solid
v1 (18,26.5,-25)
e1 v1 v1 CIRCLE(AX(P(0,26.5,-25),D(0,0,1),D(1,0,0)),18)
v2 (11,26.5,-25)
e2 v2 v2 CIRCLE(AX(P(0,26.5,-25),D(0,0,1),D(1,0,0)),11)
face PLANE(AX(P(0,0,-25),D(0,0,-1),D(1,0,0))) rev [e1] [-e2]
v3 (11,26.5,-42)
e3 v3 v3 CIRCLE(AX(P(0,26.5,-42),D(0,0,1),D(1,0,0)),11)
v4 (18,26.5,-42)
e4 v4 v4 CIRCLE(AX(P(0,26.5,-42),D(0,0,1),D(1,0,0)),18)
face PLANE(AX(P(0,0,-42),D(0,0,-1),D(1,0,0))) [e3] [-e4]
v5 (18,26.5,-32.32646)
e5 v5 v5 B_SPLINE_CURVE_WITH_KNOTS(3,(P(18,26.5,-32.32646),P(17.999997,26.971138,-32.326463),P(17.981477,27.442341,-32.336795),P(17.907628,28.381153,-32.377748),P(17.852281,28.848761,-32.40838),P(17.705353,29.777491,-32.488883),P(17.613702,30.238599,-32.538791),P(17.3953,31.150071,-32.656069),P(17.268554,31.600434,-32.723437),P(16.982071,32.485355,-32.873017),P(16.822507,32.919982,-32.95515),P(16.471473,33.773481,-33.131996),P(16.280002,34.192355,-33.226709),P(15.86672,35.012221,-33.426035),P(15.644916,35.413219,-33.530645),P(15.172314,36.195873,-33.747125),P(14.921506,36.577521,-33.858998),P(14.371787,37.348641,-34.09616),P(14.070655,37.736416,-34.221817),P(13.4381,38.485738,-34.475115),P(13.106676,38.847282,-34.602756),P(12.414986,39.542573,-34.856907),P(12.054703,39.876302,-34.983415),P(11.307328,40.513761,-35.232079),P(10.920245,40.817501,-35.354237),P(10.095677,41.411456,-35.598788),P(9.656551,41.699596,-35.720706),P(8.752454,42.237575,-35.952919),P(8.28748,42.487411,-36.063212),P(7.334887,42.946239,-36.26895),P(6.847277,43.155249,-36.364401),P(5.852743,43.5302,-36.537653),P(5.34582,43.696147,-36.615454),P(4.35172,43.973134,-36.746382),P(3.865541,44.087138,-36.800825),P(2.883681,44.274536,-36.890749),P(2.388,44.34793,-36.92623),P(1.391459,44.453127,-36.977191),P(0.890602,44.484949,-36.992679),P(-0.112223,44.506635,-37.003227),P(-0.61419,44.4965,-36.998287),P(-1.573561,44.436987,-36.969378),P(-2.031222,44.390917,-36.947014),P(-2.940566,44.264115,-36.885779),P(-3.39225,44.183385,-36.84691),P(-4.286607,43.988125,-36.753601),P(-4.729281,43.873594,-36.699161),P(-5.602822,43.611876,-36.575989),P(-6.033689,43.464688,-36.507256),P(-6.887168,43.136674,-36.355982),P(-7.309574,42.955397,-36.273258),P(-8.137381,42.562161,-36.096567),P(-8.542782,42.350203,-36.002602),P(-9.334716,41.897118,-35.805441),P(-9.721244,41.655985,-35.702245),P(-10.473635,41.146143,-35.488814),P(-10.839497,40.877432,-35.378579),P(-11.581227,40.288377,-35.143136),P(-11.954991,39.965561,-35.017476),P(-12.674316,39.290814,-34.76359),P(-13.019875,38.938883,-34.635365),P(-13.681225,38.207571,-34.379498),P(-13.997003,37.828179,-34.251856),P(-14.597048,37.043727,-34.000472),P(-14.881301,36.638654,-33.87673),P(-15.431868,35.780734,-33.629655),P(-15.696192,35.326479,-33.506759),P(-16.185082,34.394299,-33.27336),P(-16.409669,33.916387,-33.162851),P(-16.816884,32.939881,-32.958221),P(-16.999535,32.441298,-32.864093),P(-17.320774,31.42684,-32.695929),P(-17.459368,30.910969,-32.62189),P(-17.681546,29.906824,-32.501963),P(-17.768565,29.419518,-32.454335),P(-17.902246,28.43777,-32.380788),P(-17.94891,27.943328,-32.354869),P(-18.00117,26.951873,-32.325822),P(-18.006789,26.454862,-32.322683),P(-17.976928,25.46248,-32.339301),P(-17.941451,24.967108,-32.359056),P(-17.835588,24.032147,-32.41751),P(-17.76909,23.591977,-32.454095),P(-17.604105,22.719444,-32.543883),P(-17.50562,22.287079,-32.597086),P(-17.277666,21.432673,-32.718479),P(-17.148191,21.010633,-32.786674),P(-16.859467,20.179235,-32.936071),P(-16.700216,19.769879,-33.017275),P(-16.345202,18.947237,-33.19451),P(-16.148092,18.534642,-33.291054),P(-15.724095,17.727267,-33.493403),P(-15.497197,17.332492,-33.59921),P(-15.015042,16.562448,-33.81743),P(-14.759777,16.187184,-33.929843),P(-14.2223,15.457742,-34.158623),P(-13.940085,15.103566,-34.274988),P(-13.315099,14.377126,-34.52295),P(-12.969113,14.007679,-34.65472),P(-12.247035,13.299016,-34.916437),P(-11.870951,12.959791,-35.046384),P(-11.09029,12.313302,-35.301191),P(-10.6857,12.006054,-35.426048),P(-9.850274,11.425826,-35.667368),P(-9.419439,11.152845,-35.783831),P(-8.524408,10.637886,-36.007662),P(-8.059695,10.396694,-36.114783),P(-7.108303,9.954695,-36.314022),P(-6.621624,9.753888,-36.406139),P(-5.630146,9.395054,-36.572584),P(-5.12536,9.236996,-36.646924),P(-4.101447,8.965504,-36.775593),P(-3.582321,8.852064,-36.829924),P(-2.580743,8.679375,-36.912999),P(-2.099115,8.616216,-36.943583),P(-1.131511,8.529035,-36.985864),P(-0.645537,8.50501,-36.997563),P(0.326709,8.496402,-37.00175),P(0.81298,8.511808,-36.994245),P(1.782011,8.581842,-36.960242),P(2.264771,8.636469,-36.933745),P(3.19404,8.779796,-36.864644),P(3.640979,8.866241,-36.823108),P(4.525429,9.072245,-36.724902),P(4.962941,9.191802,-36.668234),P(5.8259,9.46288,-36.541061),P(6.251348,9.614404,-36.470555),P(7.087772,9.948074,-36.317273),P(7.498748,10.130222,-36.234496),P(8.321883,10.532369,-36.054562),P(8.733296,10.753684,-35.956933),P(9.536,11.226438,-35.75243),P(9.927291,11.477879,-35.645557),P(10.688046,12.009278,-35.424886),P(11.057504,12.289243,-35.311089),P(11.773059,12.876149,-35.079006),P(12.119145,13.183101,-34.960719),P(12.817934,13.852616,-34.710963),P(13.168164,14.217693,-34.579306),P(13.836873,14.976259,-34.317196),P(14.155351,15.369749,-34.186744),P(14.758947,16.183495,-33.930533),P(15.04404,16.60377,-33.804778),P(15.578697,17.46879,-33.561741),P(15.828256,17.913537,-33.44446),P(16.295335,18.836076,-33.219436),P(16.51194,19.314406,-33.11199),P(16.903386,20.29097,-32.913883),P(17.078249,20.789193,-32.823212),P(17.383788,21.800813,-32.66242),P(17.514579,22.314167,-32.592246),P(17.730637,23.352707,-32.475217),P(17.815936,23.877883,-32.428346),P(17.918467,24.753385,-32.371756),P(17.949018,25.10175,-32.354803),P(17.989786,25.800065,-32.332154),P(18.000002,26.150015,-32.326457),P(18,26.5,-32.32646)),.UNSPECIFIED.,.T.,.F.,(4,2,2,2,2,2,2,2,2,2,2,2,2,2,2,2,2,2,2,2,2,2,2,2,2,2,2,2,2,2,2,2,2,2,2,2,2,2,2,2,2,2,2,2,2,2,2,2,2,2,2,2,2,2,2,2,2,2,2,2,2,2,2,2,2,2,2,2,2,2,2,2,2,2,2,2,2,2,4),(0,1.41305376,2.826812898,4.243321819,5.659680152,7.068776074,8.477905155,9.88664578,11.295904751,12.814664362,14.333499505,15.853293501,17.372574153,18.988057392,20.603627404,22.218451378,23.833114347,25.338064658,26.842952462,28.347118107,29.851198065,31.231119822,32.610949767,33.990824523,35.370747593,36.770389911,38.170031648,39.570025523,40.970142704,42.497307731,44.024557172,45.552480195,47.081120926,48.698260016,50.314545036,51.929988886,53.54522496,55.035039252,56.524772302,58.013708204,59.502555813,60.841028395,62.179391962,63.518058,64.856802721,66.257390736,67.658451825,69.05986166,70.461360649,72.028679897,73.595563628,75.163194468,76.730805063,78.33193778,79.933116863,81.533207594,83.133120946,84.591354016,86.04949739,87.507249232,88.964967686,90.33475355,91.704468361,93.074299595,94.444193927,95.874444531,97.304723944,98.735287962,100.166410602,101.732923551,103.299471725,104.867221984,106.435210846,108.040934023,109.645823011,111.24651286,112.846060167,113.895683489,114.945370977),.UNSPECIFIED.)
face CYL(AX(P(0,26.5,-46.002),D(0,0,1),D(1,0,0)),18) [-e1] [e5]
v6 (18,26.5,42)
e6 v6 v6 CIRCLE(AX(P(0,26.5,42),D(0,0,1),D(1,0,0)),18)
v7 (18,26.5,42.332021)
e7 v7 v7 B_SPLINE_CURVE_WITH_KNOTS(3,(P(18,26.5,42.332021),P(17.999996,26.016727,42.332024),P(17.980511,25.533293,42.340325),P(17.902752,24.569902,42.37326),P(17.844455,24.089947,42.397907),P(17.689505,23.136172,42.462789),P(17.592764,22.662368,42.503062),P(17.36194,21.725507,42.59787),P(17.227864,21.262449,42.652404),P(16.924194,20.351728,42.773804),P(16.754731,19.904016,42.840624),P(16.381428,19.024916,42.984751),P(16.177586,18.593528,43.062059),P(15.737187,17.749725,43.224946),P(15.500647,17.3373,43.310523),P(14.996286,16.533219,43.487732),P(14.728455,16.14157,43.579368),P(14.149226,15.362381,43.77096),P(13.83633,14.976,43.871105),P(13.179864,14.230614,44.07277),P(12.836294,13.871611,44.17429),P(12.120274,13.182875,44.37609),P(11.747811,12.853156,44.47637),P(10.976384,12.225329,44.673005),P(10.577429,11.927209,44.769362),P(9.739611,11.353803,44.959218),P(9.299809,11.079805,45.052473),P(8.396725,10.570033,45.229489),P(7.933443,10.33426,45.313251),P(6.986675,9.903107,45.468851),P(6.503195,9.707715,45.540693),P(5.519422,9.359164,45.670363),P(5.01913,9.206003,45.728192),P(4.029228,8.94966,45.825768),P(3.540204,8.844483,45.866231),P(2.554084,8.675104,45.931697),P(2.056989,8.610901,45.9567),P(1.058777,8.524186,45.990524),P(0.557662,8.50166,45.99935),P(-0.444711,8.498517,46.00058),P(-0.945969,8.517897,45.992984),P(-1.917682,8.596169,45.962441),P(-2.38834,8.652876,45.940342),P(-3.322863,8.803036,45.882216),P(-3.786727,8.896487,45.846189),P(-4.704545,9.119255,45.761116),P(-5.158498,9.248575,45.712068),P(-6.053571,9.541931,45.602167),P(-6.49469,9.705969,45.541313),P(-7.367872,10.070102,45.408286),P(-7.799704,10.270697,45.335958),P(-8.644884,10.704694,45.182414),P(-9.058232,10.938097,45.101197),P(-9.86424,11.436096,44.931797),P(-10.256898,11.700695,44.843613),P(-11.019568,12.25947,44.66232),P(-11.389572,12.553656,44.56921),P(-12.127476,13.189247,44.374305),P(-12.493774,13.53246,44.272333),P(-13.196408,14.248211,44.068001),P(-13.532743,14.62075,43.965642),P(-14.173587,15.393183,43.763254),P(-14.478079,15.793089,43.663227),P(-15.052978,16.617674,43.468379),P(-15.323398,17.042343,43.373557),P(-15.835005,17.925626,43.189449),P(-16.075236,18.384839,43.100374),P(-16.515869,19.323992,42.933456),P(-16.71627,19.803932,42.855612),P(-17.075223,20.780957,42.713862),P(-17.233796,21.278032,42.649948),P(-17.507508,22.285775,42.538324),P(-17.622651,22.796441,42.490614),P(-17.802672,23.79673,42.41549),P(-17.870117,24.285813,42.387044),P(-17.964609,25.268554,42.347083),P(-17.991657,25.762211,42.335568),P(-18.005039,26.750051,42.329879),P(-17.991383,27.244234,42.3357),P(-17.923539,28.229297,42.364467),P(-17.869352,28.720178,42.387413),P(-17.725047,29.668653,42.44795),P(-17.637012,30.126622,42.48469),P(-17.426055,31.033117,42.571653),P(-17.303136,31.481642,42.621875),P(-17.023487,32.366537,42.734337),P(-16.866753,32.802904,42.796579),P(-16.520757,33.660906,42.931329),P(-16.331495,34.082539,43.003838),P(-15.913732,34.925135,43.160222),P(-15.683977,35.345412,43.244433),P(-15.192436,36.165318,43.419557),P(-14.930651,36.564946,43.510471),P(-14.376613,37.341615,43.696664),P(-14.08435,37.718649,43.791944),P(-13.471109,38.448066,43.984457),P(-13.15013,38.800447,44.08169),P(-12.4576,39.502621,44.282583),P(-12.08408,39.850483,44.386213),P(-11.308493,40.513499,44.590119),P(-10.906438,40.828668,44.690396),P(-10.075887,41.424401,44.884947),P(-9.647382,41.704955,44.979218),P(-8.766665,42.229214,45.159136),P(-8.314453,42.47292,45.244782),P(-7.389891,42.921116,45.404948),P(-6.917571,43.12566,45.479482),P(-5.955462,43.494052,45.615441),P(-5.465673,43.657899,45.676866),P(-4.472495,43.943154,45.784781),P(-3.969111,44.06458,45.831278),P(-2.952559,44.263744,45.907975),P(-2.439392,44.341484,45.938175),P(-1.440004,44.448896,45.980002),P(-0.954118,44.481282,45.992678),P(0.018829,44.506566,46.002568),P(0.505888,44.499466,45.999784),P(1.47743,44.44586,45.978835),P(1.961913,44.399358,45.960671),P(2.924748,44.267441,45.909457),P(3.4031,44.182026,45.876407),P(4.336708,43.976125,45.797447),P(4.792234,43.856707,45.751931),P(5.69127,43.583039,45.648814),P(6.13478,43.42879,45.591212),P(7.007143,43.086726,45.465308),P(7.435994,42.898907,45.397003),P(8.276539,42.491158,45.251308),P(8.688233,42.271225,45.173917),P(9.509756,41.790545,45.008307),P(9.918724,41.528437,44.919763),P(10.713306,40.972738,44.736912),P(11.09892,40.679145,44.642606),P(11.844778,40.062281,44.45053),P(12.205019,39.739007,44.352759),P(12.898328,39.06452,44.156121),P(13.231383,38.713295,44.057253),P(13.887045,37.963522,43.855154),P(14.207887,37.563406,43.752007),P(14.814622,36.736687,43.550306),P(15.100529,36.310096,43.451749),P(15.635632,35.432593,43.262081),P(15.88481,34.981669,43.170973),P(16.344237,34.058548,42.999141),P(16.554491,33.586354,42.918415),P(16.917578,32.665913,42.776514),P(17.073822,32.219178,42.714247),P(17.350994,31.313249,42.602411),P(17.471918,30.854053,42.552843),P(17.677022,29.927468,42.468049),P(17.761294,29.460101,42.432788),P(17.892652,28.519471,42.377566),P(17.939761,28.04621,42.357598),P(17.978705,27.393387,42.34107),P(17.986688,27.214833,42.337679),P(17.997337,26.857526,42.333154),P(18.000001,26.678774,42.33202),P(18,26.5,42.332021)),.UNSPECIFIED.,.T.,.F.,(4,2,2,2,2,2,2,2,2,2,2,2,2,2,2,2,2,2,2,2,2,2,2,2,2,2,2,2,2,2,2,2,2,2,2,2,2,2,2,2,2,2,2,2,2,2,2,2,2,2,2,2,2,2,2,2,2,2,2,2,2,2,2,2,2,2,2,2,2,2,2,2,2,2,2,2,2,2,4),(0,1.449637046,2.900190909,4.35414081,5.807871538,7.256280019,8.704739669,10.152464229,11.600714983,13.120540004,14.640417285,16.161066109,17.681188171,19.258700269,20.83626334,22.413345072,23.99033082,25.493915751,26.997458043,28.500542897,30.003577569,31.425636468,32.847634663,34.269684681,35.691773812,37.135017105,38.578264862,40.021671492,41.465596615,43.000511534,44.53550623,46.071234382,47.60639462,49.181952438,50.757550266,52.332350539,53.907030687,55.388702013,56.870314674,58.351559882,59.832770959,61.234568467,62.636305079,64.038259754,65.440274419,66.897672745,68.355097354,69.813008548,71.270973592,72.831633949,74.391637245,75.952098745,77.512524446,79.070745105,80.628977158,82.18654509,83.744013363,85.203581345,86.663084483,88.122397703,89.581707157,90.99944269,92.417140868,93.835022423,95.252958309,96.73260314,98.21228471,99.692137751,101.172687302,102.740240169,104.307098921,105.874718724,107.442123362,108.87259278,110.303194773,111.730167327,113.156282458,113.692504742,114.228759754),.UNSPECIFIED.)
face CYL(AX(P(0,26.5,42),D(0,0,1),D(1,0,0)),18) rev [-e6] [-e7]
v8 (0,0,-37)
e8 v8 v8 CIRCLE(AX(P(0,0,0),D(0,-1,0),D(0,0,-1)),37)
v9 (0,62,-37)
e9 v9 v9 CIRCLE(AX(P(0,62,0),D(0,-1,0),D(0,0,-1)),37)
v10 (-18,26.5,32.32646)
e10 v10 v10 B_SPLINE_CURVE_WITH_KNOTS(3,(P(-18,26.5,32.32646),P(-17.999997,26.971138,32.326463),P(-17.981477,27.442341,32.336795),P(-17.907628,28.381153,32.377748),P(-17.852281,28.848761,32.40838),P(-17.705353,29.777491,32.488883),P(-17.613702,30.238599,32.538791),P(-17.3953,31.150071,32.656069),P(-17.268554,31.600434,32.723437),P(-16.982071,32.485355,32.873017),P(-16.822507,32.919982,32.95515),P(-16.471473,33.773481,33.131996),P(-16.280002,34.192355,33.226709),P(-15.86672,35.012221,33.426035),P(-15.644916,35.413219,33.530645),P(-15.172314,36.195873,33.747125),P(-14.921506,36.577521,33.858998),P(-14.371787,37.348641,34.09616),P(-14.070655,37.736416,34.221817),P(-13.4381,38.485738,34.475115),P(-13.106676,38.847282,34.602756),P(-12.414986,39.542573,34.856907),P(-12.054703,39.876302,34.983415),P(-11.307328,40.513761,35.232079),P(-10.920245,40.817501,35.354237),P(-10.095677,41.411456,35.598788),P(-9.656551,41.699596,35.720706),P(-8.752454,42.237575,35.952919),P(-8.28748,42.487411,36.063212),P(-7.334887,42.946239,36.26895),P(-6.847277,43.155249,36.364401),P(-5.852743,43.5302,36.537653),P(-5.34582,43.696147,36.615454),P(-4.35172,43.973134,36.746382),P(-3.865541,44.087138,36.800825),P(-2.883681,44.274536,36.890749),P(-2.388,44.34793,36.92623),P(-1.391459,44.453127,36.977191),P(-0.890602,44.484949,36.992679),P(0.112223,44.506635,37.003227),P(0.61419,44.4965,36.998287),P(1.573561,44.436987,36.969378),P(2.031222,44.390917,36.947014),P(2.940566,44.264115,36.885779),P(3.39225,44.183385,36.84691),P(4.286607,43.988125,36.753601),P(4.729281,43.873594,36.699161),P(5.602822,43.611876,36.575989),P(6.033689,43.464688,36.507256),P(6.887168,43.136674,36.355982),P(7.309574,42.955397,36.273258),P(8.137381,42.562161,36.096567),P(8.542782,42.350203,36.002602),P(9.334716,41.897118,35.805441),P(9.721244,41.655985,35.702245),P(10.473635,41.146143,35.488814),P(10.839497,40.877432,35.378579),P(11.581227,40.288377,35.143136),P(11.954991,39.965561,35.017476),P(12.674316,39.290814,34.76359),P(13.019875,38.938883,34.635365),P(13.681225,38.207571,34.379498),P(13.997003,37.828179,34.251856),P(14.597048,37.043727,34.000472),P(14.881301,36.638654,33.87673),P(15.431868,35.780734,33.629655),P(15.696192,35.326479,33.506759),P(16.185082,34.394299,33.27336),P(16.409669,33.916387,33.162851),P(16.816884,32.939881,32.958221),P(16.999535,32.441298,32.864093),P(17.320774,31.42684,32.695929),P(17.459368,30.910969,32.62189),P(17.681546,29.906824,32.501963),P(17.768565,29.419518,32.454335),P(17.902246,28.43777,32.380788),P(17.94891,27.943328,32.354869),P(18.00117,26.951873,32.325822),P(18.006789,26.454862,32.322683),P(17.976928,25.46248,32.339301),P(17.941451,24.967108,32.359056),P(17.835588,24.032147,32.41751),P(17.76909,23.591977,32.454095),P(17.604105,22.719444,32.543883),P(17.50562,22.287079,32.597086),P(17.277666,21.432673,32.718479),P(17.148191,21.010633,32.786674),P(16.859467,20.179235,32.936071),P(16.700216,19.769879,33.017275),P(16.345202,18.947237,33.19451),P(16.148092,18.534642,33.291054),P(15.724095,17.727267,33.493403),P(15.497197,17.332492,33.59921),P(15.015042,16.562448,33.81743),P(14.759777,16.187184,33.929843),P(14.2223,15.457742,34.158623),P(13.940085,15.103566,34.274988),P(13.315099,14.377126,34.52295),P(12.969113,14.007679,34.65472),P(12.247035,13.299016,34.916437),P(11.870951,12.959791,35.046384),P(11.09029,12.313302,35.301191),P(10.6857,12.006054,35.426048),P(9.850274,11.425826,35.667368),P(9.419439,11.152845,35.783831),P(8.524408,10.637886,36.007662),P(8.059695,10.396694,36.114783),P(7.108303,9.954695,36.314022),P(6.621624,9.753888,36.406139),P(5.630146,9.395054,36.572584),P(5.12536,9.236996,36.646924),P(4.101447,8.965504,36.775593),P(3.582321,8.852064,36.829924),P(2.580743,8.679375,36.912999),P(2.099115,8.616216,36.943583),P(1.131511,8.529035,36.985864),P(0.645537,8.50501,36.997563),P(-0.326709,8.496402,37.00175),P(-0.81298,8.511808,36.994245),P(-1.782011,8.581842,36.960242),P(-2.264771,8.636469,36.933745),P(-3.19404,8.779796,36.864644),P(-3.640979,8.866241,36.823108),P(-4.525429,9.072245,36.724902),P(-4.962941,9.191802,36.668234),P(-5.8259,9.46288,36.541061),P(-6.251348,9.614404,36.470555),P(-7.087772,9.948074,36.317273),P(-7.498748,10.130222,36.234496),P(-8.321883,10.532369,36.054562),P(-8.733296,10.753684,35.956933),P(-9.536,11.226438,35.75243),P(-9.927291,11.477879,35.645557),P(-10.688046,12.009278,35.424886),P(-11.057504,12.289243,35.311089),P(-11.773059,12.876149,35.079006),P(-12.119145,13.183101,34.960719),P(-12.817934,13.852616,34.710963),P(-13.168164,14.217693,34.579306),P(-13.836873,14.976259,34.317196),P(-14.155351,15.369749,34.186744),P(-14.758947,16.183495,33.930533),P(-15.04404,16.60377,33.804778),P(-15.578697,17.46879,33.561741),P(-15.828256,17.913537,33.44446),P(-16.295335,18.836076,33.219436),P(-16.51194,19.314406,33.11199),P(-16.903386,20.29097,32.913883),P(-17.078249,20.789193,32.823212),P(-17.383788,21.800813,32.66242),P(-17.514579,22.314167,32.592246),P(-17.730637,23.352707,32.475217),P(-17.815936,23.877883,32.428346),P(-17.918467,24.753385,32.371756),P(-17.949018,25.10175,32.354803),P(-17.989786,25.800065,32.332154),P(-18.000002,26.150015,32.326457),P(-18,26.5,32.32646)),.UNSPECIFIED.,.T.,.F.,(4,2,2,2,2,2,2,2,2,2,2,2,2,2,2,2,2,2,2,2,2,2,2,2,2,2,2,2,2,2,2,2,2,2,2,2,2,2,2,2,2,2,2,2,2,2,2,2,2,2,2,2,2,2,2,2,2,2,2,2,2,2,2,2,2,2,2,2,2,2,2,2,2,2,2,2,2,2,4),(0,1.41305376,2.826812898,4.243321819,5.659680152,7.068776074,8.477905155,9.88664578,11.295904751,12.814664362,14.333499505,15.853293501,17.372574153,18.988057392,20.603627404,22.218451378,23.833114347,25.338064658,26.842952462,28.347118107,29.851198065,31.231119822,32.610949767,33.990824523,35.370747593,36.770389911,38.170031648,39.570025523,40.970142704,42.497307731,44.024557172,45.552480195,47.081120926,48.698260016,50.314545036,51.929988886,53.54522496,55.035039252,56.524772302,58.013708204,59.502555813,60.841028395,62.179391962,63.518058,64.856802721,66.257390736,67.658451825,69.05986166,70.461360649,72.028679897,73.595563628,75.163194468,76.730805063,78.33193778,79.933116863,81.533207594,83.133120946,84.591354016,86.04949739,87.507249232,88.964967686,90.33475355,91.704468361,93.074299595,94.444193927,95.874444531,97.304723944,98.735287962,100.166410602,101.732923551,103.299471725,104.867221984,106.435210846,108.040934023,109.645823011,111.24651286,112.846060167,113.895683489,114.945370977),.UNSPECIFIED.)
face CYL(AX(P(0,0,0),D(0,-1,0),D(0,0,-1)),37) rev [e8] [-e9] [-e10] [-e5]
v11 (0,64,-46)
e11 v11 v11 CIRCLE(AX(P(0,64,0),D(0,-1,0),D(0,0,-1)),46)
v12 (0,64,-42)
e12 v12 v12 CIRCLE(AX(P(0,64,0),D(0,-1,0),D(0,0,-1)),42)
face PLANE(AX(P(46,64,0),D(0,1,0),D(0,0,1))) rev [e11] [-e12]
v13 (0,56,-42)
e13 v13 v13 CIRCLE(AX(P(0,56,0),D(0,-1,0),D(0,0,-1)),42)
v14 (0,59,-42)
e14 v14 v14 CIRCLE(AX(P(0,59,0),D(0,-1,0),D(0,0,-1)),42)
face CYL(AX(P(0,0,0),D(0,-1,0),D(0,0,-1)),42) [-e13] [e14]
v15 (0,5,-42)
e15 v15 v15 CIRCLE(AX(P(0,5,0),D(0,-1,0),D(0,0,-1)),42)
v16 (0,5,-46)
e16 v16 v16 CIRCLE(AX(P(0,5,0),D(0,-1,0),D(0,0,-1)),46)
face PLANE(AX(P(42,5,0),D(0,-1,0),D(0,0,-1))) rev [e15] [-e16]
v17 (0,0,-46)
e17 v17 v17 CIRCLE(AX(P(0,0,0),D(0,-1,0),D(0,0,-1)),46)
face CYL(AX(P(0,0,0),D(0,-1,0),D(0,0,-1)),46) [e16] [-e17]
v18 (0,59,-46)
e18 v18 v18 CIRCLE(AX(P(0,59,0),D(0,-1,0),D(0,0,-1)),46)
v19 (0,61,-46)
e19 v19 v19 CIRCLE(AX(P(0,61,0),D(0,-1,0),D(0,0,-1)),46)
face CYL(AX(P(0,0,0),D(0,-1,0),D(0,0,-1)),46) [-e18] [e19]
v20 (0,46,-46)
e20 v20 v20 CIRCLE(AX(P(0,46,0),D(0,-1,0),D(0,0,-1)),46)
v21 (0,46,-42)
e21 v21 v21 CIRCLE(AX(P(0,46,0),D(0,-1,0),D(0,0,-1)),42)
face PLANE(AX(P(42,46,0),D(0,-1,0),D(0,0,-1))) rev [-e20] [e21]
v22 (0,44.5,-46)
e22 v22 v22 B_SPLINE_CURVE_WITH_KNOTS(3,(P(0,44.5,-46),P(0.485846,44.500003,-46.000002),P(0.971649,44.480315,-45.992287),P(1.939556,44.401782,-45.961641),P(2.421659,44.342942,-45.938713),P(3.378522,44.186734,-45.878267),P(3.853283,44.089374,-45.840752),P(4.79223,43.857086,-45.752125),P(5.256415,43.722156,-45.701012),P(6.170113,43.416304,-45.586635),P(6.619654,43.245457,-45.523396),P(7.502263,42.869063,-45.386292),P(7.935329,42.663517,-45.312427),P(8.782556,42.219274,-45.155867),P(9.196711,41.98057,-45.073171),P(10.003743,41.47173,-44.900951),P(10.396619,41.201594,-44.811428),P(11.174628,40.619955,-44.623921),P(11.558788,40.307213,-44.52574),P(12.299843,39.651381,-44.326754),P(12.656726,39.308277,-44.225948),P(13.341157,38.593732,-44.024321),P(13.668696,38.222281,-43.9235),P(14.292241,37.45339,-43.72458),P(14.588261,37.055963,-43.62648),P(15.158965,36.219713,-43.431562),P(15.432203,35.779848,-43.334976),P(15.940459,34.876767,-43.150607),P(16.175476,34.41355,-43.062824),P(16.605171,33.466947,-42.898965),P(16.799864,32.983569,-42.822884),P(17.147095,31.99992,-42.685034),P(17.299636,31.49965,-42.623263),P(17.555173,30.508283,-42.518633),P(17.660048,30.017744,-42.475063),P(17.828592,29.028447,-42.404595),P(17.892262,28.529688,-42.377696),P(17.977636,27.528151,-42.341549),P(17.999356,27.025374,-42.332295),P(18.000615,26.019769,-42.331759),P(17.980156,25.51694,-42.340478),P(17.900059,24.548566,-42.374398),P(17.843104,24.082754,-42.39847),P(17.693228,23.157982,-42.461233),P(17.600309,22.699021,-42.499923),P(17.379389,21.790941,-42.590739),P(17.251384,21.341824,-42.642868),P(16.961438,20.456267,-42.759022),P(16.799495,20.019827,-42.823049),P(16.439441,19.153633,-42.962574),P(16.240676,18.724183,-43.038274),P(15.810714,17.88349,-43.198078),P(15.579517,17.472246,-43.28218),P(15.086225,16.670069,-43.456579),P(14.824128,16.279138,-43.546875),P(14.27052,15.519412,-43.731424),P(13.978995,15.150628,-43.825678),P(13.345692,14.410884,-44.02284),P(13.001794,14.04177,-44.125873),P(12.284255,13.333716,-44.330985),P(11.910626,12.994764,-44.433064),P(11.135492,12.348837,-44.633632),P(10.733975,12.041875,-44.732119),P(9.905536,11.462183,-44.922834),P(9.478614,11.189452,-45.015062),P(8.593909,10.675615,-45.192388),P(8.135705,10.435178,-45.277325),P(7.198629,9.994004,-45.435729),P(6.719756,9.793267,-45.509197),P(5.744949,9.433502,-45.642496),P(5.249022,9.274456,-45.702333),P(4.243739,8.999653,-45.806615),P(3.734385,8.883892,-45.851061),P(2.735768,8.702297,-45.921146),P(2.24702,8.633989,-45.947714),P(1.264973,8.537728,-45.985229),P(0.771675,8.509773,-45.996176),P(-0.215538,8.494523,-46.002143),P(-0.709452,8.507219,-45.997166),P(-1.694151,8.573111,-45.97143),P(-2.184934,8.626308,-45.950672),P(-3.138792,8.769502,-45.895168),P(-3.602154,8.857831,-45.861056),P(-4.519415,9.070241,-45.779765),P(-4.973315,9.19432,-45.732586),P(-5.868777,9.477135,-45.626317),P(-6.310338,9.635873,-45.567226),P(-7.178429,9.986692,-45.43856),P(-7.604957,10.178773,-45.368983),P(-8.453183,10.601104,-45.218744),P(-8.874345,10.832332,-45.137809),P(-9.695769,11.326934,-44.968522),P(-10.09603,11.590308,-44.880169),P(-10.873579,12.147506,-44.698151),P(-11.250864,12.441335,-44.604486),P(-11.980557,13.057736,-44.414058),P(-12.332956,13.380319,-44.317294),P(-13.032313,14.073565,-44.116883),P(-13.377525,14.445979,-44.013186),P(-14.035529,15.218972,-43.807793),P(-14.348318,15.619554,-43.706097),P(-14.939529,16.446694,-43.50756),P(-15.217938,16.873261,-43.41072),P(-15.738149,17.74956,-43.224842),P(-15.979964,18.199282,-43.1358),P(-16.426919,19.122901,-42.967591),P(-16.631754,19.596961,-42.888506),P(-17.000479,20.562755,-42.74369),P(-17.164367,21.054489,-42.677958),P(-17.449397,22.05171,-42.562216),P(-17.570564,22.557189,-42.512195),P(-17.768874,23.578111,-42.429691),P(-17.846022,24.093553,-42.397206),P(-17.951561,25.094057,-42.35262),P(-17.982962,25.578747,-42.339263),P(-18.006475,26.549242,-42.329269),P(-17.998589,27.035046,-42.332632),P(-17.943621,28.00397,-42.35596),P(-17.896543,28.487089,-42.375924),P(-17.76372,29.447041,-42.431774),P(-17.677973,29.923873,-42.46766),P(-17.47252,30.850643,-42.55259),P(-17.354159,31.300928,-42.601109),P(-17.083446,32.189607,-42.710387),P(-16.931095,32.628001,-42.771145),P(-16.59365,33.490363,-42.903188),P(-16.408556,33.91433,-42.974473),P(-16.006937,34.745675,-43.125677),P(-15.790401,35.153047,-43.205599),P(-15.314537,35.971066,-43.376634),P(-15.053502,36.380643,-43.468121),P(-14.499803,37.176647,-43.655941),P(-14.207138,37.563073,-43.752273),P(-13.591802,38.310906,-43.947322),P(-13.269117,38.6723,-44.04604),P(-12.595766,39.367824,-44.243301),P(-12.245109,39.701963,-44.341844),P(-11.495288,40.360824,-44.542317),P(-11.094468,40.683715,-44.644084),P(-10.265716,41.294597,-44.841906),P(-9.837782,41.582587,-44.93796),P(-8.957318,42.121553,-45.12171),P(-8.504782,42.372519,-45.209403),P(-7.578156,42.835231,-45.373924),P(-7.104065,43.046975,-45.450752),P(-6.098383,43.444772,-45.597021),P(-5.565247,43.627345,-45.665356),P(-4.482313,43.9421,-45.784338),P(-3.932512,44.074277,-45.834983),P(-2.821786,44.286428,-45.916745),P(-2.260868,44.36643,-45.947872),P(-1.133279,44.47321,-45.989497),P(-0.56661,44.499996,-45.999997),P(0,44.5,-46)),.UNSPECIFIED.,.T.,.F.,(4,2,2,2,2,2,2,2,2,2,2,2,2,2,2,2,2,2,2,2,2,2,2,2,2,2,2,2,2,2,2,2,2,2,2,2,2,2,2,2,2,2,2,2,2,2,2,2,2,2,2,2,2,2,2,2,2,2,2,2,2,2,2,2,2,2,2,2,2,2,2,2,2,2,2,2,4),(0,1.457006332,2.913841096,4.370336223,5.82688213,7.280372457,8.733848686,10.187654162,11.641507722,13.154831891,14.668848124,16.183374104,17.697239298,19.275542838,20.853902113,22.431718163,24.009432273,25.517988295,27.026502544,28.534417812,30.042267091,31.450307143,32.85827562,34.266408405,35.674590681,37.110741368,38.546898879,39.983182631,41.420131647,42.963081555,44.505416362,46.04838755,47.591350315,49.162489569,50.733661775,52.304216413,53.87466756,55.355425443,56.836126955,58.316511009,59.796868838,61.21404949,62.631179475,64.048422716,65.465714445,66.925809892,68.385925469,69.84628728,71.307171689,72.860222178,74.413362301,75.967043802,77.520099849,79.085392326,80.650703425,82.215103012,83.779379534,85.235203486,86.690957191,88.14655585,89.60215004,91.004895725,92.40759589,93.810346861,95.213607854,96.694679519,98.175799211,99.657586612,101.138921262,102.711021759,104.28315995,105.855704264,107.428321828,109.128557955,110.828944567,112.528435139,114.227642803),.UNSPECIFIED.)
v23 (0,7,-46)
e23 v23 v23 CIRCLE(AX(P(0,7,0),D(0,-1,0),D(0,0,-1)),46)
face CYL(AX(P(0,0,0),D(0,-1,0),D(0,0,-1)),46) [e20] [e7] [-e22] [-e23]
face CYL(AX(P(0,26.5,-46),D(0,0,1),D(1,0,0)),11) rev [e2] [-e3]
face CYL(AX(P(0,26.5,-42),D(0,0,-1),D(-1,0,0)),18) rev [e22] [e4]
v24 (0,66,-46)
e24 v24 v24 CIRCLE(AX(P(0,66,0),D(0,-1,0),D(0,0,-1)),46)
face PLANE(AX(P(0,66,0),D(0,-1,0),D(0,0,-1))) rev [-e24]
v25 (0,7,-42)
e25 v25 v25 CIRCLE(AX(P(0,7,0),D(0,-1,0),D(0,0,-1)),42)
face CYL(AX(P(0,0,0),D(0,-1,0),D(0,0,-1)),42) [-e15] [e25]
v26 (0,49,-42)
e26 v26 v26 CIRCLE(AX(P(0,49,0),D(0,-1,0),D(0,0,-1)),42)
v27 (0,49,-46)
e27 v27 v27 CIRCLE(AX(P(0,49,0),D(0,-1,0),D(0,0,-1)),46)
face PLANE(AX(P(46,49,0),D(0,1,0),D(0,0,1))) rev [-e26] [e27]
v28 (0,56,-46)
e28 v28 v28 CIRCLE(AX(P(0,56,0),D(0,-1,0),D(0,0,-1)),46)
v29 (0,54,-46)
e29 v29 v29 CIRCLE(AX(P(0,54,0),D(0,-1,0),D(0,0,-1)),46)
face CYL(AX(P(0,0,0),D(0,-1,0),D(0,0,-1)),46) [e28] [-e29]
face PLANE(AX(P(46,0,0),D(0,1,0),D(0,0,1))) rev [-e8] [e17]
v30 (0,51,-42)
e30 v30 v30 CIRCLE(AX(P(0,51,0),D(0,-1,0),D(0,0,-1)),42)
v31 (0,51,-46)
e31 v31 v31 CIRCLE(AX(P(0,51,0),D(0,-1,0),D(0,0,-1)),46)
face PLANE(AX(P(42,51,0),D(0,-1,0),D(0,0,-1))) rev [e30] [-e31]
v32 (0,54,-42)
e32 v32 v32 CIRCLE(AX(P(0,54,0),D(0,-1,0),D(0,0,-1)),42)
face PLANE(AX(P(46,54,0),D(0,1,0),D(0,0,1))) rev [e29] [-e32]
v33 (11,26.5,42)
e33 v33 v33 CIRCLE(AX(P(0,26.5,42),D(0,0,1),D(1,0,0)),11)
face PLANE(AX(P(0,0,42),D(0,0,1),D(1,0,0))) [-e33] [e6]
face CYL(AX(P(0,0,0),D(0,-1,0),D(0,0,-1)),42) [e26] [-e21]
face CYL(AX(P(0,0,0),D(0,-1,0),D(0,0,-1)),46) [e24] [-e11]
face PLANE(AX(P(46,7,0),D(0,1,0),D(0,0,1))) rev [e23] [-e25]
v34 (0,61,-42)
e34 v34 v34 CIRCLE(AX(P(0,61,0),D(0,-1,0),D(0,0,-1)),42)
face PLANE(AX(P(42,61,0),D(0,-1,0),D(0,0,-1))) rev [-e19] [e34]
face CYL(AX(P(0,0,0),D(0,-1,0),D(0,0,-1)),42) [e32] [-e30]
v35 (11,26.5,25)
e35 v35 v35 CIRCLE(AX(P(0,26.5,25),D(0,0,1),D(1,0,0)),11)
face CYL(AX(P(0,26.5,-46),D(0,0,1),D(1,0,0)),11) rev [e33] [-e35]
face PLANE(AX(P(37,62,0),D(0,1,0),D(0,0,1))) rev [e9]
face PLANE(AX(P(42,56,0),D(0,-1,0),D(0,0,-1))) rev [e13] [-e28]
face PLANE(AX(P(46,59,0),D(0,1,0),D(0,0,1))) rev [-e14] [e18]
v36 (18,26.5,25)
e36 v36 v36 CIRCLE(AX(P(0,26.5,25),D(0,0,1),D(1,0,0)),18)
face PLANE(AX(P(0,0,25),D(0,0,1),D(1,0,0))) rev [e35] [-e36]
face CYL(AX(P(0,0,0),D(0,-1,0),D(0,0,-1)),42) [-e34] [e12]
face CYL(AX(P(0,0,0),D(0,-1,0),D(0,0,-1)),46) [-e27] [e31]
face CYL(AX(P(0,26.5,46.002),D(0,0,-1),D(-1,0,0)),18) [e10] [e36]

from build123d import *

# Parameters (mm, degrees)
CUT_EXTRUDE1_DEPTH       = 93.671462706
CUT_EXTRUDE1_DEPTH_BACK  = 93.671462706
SKETCH2_R                = 11
BOSS_EXTRUDE1_REACH      = 119.671
BOSS_EXTRUDE1_END_RADIUS = 37
BOSS_EXTRUDE1_START      = 25
SKETCH2_3_R              = 18
SKETCH2_3_R_2            = 11
CUT_EXTRUDE3_START       = 42
SKETCH2_5_R              = 18
SKETCH2_5_R_2            = 11
CUT_EXTRUDE3_DEPTH       = 4


with BuildPart() as part:
    # Sketch1 → Revolve1 (revolve)
    with BuildSketch(Plane.XY, mode=Mode.PRIVATE) as revolve1_sk:
        Polygon((0, 66), (46, 66), (46, 64), (42, 64), (42, 61), (46, 61), (46, 59), (42, 59), (42, 56), (46, 56), (46, 54), (42, 54), (42, 51), (46, 51), (46, 49), (42, 49), (42, 46), (46, 46), (46, 7), (42, 7), (42, 5), (46, 5), (46, 0), (37, 0), (37, 62), (0, 62), align=None)
    revolve(revolve1_sk.sketch.rotate(Axis((0, 0, 0), (0, 1, 0)), 90), axis=Axis((0, 0, 0), (0, 1, 0)))

    # Sketch2 → Cut-Extrude1 (cut, two sides: drawn at the far end of the back side and taken through both)
    with BuildSketch(Plane.XY.offset(-CUT_EXTRUDE1_DEPTH_BACK)):
        with Locations((0, 26.5)):
            Circle(SKETCH2_R)
    extrude(amount=CUT_EXTRUDE1_DEPTH + CUT_EXTRUDE1_DEPTH_BACK, mode=Mode.SUBTRACT)

    # Boss-Extrude1: up to this cylinder (the profile starts inside it)
    boss_extrude1_end = Plane(origin=(0, 26.5, 0), z_dir=(0, -1, 0)) * Cylinder(BOSS_EXTRUDE1_END_RADIUS, 314.342, mode=Mode.PRIVATE)
    # Sketch2<3> → Boss-Extrude1 (add, up to the surface)
    with BuildSketch(Plane.XY.offset(BOSS_EXTRUDE1_START), mode=Mode.PRIVATE) as boss_extrude1_sk1:
        with Locations(Location((0, 26.5, 0), (0, 0, 180))):
            Circle(SKETCH2_3_R)
        with Locations((0, 26.5)):
            Circle(SKETCH2_3_R_2, mode=Mode.SUBTRACT)
    boss_extrude1_tool1 = extrude(boss_extrude1_sk1.sketch, amount=BOSS_EXTRUDE1_REACH, mode=Mode.PRIVATE) & boss_extrude1_end
    boss_extrude1 = boss_extrude1_tool1.solids().sort_by_distance((17.490883, 26.5, 25))[0]
    add(boss_extrude1)

    # Sketch2<5> → Cut-Extrude3 (cut)
    with BuildSketch(Plane.XY.offset(CUT_EXTRUDE3_START)):
        with Locations(Location((0, 26.5, 0), (0, 0, 180))):
            Circle(SKETCH2_5_R)
        with Locations((0, 26.5)):
            Circle(SKETCH2_5_R_2, mode=Mode.SUBTRACT)
    cut_extrude3 = extrude(amount=CUT_EXTRUDE3_DEPTH, mode=Mode.SUBTRACT)

    # Mirror1: Boss-Extrude1, Cut-Extrude3 across plane
    add(boss_extrude1.mirror(Plane.XY))
    add(cut_extrude3.mirror(Plane.XY), mode=Mode.SUBTRACT)


solid = part.part
